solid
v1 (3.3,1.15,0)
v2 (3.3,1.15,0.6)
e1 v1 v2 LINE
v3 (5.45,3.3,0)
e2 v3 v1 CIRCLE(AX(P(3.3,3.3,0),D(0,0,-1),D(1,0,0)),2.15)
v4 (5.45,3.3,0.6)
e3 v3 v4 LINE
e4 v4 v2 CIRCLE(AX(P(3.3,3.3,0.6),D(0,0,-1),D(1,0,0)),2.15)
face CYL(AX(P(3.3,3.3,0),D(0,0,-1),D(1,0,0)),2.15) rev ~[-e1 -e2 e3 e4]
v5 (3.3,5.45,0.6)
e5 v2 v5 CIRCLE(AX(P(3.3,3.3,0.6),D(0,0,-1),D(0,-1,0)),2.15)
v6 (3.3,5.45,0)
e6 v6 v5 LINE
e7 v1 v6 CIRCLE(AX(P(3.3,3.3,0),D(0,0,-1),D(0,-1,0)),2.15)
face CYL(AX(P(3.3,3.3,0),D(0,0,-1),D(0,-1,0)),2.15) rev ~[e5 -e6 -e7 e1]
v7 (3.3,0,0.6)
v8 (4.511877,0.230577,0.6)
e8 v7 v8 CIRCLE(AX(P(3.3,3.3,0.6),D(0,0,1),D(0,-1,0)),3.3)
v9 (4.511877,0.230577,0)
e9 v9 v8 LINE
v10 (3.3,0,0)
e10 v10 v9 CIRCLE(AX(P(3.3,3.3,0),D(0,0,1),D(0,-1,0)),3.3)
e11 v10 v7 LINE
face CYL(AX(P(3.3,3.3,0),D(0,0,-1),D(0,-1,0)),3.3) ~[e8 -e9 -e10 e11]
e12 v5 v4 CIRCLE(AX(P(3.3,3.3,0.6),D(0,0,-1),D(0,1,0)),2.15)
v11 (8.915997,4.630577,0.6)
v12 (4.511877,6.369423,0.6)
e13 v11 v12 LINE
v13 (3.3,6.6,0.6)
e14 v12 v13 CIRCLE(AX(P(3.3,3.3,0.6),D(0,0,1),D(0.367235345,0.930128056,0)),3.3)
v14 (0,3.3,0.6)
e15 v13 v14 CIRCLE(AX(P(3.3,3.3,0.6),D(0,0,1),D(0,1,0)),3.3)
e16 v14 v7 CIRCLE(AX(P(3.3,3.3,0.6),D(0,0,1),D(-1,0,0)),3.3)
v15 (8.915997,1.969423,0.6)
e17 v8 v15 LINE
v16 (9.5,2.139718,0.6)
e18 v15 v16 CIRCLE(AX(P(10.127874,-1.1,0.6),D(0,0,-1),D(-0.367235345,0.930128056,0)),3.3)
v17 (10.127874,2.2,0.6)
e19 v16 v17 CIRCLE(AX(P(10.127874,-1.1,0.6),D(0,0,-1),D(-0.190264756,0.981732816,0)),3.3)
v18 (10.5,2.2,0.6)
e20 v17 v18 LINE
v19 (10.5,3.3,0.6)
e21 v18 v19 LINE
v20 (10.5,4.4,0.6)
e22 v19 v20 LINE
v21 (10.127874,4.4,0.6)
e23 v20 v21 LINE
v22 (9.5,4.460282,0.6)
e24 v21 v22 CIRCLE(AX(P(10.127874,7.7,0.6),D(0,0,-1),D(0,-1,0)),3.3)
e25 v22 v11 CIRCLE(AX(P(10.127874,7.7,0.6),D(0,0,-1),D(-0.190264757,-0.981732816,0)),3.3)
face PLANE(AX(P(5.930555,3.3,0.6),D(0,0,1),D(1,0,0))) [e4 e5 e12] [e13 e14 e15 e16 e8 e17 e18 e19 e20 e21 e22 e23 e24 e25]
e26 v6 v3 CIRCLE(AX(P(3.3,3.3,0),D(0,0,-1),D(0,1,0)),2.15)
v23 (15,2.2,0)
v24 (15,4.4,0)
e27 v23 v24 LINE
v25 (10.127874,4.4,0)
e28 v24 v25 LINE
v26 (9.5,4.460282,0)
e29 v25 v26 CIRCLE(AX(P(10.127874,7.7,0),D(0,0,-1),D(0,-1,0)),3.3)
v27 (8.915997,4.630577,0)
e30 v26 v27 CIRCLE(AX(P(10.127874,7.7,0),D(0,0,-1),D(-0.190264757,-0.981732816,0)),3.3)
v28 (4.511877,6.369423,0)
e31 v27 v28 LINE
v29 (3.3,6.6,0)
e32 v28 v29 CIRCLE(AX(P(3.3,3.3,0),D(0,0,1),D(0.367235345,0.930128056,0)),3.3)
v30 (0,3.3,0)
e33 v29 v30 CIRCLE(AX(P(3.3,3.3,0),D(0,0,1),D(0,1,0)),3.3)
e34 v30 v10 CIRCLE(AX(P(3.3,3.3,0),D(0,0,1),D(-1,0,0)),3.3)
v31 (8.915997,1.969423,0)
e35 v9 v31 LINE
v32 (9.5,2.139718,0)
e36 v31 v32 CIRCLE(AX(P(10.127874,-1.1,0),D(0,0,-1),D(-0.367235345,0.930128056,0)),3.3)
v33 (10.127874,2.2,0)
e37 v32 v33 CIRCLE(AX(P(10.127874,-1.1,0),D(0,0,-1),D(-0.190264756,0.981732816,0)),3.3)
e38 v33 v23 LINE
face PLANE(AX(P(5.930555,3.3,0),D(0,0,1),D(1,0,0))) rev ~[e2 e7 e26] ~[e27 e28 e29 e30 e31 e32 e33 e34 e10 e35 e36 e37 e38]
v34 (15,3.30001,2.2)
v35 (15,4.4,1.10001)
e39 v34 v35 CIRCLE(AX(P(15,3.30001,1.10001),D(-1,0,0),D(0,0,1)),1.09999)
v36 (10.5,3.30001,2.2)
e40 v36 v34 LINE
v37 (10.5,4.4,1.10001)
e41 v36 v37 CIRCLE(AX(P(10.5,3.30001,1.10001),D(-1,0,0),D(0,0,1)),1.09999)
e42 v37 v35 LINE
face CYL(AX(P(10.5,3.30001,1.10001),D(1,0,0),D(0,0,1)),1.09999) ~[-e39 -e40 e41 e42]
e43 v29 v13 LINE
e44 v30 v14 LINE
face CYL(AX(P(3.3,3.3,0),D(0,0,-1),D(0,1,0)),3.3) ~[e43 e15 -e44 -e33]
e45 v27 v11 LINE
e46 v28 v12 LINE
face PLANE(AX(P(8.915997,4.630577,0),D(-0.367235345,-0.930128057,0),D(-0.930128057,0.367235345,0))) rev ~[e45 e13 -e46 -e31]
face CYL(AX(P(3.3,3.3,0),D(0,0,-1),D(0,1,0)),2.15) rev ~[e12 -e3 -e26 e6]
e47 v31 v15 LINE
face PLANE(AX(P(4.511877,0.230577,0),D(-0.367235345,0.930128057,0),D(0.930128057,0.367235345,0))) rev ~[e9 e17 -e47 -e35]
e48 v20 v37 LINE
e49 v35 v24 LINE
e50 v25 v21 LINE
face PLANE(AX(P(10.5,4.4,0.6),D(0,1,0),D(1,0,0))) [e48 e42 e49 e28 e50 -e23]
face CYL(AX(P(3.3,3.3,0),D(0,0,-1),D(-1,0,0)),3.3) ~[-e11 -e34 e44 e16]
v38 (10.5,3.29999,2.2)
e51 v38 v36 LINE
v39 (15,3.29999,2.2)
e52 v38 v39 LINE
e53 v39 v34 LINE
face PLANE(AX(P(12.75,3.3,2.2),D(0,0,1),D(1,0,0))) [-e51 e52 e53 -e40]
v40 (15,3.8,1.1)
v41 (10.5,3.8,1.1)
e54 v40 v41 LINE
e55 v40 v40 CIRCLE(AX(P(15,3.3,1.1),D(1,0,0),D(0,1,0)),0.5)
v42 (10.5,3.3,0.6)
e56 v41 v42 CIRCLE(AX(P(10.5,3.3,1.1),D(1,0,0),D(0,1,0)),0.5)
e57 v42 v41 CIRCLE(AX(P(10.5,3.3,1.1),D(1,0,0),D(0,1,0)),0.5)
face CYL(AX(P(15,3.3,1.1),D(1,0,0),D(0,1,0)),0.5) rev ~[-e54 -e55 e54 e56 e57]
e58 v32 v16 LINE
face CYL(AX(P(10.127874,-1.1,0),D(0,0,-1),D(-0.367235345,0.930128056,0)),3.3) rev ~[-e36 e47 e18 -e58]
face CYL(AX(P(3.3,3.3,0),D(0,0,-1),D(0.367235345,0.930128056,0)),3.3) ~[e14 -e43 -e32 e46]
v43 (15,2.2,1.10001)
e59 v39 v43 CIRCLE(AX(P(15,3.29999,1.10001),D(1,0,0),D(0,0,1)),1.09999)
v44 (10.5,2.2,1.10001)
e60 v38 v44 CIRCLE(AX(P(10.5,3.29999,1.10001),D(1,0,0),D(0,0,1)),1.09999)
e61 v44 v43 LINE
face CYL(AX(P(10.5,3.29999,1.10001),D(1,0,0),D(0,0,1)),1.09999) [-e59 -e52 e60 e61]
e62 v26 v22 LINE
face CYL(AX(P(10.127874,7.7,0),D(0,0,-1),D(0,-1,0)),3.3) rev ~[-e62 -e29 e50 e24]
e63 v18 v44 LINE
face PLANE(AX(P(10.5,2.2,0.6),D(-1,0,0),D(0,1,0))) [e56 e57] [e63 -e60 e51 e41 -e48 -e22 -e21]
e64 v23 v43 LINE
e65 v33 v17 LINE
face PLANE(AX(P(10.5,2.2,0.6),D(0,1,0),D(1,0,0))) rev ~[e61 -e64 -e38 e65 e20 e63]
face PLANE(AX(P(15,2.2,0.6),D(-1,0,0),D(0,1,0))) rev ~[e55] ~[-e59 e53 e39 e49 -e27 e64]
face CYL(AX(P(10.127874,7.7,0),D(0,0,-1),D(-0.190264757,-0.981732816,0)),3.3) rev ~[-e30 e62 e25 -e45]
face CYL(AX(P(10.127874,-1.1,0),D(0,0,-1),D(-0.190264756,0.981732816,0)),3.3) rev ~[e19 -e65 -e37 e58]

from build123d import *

# Parameters (mm, degrees)
F0_W     = 4.5
F0_H     = 2.2
F1_DEPTH = 0.6
F2_W     = 4.5
F2_H     = 2.2
F3_DEPTH = 1.6
F4_R     = 1.09999
F5_R     = 0.5
F6_DEPTH = 25


# Not quite as in the source:
# - a fillet or chamfer is up to 0.001 mm smaller than in the source, because OpenCascade refuses the exact size


with BuildPart() as f1:
    # F0 (on Top) → F1 (new body)
    with BuildSketch(Plane.XY):
        with BuildLine():
            ThreePointArc((8.9159970588, 1.9694225865), (9.2040660975, 2.0680561106), (9.5, 2.1397182935))
            Line((9.5, 2.1397182935), (9.5, 4.4602817065))
            ThreePointArc((9.5, 4.4602817065), (9.2040660975, 4.5319438894), (8.9159970588, 4.6305774135))
            Line((8.9159970588, 4.6305774135), (4.5118766379, 6.3694225865))
            ThreePointArc((4.5118766379, 6.3694225865), (3.9168085053, 6.5418431899), (3.3, 6.6))
            Line((3.3, 6.6), (3.3, 5.45))
            ThreePointArc((3.3, 5.45), (4.8202795796, 4.8202795796), (5.45, 3.3))
            ThreePointArc((5.45, 3.3), (4.8202795796, 1.7797204204), (3.3, 1.15))
            Line((3.3, 1.15), (3.3, 0))
            ThreePointArc((3.3, 0), (3.9168085053, 0.0581568101), (4.5118766379, 0.2305774135))
            Line((4.5118766379, 0.2305774135), (8.9159970588, 1.9694225865))
        make_face()
        with Locations((12.75, 3.3)):
            Rectangle(F0_W, F0_H)
        with BuildLine():
            Line((10.1278736967, 2.2), (10.5, 2.2))
            Line((10.5, 2.2), (10.5, 4.4))
            Line((10.5, 4.4), (10.1278736967, 4.4))
            ThreePointArc((10.1278736967, 4.4), (9.8124932664, 4.4151049965), (9.5, 4.4602817065))
            Line((9.5, 4.4602817065), (9.5, 2.1397182935))
            ThreePointArc((9.5, 2.1397182935), (9.8124932664, 2.1848950035), (10.1278736967, 2.2))
        make_face()
        with BuildLine():
            ThreePointArc((0, 3.3), (0.9665476221, 0.9665476221), (3.3, 0))
            Line((3.3, 0), (3.3, 1.15))
            ThreePointArc((3.3, 1.15), (1.15, 3.3), (3.3, 5.45))
            Line((3.3, 5.45), (3.3, 6.6))
            ThreePointArc((3.3, 6.6), (0.9665476221, 5.6334523779), (0, 3.3))
        make_face()
    extrude(amount=F1_DEPTH)

    # F2 (on face) → F3 (join)
    with BuildSketch(Plane.XY.offset(0.6)):
        with Locations((12.75, 3.3)):
            Rectangle(F2_W, F2_H)
    extrude(amount=F3_DEPTH)

    # F4 (radius 1.1 in the source; OpenCascade refuses exactly that, so slightly less here)
    f4_edges = [f1.edges().sort_by_distance(p)[0] for p in [
        (12.75, 4.4, 2.2),
        (12.75, 2.2, 2.2),
    ]]
    fillet(f4_edges, radius=F4_R)

    # F5 (on face) → F6 (cut)
    with BuildSketch(Plane.YZ.offset(15)):
        with Locations((3.3, 1.1)):
            Circle(F5_R)
    extrude(amount=-F6_DEPTH, mode=Mode.SUBTRACT)


solid = f1.part
